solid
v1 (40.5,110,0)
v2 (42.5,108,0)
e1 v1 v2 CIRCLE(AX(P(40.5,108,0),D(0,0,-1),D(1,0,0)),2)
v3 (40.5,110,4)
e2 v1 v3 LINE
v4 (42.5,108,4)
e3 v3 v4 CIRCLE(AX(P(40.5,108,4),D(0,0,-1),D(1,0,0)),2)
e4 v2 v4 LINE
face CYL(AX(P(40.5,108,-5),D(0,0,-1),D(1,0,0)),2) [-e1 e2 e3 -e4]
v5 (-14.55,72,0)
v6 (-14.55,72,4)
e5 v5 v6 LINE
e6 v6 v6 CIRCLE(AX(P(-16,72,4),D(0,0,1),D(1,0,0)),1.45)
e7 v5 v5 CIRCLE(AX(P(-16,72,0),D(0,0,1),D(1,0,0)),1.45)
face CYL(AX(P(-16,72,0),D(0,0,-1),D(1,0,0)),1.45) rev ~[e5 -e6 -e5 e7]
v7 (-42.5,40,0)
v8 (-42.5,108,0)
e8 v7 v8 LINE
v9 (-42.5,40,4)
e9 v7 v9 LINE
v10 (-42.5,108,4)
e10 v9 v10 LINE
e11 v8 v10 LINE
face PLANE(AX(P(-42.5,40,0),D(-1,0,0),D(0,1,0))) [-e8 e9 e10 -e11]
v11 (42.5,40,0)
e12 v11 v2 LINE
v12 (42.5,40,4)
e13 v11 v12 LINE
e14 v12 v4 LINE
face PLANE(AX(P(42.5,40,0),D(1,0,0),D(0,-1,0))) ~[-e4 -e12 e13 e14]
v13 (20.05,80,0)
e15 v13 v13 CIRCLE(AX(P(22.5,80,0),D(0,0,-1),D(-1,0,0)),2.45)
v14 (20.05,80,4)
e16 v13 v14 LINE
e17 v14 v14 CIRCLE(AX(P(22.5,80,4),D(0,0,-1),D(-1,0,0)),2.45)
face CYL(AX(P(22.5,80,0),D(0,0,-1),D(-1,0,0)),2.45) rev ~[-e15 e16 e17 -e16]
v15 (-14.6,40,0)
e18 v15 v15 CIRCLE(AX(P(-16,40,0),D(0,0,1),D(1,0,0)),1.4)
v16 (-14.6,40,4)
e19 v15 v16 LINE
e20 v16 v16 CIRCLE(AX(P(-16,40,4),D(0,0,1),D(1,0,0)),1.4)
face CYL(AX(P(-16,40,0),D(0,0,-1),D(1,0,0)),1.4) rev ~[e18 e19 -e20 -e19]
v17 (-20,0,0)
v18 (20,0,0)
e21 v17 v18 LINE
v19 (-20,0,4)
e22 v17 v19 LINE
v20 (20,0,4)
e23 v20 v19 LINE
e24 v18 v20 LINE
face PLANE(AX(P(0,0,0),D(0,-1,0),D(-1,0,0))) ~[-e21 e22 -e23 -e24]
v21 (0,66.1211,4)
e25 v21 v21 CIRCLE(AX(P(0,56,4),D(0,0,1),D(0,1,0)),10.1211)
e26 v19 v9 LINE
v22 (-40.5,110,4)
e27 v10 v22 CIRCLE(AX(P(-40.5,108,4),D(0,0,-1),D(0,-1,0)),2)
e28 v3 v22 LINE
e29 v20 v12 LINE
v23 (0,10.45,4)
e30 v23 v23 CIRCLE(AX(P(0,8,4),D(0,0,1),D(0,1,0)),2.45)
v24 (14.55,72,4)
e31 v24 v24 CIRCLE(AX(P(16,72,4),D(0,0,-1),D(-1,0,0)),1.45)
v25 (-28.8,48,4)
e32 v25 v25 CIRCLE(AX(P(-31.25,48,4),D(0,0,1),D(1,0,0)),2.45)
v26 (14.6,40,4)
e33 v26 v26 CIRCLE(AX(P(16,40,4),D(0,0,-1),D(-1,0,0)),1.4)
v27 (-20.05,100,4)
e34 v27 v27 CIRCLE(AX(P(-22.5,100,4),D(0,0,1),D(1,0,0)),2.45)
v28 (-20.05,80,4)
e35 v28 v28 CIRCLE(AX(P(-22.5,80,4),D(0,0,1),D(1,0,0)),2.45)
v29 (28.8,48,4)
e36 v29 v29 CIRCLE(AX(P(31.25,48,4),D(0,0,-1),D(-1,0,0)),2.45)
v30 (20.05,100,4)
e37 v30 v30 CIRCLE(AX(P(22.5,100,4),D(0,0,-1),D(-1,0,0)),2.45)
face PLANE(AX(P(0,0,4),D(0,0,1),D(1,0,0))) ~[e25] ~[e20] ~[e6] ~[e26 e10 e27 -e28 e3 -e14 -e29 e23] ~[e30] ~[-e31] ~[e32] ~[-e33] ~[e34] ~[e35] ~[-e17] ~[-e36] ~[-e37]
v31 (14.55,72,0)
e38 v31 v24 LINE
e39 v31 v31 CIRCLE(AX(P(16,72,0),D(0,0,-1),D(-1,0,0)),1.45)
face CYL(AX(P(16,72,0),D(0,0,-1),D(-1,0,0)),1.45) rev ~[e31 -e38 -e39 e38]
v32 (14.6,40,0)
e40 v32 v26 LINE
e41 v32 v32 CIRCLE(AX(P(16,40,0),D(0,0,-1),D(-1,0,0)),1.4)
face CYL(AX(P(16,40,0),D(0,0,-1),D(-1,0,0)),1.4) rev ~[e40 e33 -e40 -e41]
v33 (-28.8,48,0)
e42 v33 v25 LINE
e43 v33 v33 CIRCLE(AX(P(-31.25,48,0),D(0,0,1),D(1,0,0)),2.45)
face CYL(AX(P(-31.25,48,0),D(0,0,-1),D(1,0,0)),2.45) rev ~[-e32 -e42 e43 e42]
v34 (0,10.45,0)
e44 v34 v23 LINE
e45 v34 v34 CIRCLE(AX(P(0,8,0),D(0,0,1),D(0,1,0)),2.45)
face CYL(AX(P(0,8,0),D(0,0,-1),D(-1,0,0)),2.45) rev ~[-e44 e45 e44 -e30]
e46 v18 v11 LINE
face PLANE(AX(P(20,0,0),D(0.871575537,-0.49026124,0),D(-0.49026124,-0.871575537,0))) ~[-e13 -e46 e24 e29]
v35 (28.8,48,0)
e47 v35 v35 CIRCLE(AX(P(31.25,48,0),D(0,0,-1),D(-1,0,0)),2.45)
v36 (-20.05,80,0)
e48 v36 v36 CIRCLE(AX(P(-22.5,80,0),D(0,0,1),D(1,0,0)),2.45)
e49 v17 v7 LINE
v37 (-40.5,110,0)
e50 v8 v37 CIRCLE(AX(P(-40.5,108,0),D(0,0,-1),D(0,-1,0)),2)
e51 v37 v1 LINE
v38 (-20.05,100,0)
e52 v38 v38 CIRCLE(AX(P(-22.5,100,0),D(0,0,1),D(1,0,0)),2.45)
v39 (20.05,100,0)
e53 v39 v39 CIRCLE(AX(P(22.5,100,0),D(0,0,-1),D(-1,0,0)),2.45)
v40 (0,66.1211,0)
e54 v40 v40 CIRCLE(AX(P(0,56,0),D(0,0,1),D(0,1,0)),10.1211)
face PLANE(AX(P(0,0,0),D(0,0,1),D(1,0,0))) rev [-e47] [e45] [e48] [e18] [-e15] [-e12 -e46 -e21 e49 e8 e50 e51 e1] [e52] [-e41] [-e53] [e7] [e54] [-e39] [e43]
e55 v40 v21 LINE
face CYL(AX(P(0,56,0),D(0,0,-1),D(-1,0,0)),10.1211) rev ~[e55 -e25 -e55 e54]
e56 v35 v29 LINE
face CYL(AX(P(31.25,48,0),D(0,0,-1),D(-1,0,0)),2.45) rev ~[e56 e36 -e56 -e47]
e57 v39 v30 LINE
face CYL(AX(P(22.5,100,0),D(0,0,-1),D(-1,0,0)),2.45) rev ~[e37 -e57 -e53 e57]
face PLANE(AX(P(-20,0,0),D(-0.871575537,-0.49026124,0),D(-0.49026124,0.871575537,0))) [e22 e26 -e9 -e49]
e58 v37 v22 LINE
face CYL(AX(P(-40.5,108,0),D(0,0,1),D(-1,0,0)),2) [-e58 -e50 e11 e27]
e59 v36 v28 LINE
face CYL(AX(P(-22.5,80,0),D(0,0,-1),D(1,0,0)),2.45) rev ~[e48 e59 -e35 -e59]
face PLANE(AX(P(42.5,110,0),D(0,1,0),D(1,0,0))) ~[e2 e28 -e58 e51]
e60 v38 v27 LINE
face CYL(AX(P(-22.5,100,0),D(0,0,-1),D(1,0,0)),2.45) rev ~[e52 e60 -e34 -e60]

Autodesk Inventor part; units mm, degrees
ref_plane "YZ Plane" through (0, 0, 0) normal (1, 0, 0) x (0, 1, 0)
ref_plane "XZ Plane" through (0, 0, 0) normal (0, 1, 0) x (-1, 0, 0)
ref_plane "XY Plane" through (0, 0, 0) normal (0, 0, 1) x (1, 0, 0)
sketch "Sketch1" plane through (0, 0, 0) normal (0, 0, 1) x (1, 0, 0)
  line L0 (0, 0) -> (-20, 0)
  line L1 (-20, 0) -> (-42.5, 40)
  line L2 (-42.5, 40) -> (-42.5, 110)
  line L3 (-42.5, 110) -> (0, 110)
  circle A0 centre (0, 8) radius 2.45
  circle A1 centre (-31.25, 48) radius 2.45
  circle A2 centre (0, 56) radius 10.1211
  line L4 (16, 72) -> (-16, 72) construction
  line L5 (-16, 72) -> (-16, 40) construction
  line L6 (-16, 40) -> (16, 40) construction
  line L7 (16, 40) -> (16, 72) construction
  line L8 (16, 72) -> (-16, 40) construction
  line L9 (-16, 72) -> (16, 40) construction
  circle A3 centre (-16, 72) radius 1.45
  circle A4 centre (-16, 40) radius 1.4
  circle A5 centre (-22.5, 100) radius 2.45
  circle A6 centre (-22.5, 80) radius 2.45
  line L10 (0, 110) -> (0, 66.1211)
  line L11 (0, 45.8789) -> (0, 10.45)
  line L12 (0, 5.55) -> (0, 0)
  dimension "d0" = 20
  dimension "d2" = 40
  dimension "d3" = 70
  dimension "d4" = 4.9
  dimension "d5" = 4.9
  dimension "d6" = 32
  dimension "d7" = 32
  dimension "d8" = 8
  dimension "d9" = 40
  dimension "d10" = 8
  dimension "d11" = 2.9
  dimension "d12" = 2.8
  dimension "d13" = 4.9
  dimension "d14" = 4.9
  dimension "d15" = 10
  dimension "d16" = 30
  dimension "d17" = 20
  dimension "d18" = 20
extrude "Extrusion1" add sketch "Sketch1" along normal blind 4 contours L0 L1 L2 L3 L10 A2 L11 A0 L12
fillet "Fillet1" radius 2 1 edges at (-42.5, 110, 2)
mirror "Mirror1" about plane through (0, 66.1211, 0) normal (1, 0, 0) of "Extrusion1", "Fillet1"
ref_plane "Work Plane1" through (-20, 28, 0) normal (0, -1, 0) x (1, 0, 0)
equation "\"d17\" = d18"
properties part number "TOTEM_Base_Slide_x_20mmrod"
